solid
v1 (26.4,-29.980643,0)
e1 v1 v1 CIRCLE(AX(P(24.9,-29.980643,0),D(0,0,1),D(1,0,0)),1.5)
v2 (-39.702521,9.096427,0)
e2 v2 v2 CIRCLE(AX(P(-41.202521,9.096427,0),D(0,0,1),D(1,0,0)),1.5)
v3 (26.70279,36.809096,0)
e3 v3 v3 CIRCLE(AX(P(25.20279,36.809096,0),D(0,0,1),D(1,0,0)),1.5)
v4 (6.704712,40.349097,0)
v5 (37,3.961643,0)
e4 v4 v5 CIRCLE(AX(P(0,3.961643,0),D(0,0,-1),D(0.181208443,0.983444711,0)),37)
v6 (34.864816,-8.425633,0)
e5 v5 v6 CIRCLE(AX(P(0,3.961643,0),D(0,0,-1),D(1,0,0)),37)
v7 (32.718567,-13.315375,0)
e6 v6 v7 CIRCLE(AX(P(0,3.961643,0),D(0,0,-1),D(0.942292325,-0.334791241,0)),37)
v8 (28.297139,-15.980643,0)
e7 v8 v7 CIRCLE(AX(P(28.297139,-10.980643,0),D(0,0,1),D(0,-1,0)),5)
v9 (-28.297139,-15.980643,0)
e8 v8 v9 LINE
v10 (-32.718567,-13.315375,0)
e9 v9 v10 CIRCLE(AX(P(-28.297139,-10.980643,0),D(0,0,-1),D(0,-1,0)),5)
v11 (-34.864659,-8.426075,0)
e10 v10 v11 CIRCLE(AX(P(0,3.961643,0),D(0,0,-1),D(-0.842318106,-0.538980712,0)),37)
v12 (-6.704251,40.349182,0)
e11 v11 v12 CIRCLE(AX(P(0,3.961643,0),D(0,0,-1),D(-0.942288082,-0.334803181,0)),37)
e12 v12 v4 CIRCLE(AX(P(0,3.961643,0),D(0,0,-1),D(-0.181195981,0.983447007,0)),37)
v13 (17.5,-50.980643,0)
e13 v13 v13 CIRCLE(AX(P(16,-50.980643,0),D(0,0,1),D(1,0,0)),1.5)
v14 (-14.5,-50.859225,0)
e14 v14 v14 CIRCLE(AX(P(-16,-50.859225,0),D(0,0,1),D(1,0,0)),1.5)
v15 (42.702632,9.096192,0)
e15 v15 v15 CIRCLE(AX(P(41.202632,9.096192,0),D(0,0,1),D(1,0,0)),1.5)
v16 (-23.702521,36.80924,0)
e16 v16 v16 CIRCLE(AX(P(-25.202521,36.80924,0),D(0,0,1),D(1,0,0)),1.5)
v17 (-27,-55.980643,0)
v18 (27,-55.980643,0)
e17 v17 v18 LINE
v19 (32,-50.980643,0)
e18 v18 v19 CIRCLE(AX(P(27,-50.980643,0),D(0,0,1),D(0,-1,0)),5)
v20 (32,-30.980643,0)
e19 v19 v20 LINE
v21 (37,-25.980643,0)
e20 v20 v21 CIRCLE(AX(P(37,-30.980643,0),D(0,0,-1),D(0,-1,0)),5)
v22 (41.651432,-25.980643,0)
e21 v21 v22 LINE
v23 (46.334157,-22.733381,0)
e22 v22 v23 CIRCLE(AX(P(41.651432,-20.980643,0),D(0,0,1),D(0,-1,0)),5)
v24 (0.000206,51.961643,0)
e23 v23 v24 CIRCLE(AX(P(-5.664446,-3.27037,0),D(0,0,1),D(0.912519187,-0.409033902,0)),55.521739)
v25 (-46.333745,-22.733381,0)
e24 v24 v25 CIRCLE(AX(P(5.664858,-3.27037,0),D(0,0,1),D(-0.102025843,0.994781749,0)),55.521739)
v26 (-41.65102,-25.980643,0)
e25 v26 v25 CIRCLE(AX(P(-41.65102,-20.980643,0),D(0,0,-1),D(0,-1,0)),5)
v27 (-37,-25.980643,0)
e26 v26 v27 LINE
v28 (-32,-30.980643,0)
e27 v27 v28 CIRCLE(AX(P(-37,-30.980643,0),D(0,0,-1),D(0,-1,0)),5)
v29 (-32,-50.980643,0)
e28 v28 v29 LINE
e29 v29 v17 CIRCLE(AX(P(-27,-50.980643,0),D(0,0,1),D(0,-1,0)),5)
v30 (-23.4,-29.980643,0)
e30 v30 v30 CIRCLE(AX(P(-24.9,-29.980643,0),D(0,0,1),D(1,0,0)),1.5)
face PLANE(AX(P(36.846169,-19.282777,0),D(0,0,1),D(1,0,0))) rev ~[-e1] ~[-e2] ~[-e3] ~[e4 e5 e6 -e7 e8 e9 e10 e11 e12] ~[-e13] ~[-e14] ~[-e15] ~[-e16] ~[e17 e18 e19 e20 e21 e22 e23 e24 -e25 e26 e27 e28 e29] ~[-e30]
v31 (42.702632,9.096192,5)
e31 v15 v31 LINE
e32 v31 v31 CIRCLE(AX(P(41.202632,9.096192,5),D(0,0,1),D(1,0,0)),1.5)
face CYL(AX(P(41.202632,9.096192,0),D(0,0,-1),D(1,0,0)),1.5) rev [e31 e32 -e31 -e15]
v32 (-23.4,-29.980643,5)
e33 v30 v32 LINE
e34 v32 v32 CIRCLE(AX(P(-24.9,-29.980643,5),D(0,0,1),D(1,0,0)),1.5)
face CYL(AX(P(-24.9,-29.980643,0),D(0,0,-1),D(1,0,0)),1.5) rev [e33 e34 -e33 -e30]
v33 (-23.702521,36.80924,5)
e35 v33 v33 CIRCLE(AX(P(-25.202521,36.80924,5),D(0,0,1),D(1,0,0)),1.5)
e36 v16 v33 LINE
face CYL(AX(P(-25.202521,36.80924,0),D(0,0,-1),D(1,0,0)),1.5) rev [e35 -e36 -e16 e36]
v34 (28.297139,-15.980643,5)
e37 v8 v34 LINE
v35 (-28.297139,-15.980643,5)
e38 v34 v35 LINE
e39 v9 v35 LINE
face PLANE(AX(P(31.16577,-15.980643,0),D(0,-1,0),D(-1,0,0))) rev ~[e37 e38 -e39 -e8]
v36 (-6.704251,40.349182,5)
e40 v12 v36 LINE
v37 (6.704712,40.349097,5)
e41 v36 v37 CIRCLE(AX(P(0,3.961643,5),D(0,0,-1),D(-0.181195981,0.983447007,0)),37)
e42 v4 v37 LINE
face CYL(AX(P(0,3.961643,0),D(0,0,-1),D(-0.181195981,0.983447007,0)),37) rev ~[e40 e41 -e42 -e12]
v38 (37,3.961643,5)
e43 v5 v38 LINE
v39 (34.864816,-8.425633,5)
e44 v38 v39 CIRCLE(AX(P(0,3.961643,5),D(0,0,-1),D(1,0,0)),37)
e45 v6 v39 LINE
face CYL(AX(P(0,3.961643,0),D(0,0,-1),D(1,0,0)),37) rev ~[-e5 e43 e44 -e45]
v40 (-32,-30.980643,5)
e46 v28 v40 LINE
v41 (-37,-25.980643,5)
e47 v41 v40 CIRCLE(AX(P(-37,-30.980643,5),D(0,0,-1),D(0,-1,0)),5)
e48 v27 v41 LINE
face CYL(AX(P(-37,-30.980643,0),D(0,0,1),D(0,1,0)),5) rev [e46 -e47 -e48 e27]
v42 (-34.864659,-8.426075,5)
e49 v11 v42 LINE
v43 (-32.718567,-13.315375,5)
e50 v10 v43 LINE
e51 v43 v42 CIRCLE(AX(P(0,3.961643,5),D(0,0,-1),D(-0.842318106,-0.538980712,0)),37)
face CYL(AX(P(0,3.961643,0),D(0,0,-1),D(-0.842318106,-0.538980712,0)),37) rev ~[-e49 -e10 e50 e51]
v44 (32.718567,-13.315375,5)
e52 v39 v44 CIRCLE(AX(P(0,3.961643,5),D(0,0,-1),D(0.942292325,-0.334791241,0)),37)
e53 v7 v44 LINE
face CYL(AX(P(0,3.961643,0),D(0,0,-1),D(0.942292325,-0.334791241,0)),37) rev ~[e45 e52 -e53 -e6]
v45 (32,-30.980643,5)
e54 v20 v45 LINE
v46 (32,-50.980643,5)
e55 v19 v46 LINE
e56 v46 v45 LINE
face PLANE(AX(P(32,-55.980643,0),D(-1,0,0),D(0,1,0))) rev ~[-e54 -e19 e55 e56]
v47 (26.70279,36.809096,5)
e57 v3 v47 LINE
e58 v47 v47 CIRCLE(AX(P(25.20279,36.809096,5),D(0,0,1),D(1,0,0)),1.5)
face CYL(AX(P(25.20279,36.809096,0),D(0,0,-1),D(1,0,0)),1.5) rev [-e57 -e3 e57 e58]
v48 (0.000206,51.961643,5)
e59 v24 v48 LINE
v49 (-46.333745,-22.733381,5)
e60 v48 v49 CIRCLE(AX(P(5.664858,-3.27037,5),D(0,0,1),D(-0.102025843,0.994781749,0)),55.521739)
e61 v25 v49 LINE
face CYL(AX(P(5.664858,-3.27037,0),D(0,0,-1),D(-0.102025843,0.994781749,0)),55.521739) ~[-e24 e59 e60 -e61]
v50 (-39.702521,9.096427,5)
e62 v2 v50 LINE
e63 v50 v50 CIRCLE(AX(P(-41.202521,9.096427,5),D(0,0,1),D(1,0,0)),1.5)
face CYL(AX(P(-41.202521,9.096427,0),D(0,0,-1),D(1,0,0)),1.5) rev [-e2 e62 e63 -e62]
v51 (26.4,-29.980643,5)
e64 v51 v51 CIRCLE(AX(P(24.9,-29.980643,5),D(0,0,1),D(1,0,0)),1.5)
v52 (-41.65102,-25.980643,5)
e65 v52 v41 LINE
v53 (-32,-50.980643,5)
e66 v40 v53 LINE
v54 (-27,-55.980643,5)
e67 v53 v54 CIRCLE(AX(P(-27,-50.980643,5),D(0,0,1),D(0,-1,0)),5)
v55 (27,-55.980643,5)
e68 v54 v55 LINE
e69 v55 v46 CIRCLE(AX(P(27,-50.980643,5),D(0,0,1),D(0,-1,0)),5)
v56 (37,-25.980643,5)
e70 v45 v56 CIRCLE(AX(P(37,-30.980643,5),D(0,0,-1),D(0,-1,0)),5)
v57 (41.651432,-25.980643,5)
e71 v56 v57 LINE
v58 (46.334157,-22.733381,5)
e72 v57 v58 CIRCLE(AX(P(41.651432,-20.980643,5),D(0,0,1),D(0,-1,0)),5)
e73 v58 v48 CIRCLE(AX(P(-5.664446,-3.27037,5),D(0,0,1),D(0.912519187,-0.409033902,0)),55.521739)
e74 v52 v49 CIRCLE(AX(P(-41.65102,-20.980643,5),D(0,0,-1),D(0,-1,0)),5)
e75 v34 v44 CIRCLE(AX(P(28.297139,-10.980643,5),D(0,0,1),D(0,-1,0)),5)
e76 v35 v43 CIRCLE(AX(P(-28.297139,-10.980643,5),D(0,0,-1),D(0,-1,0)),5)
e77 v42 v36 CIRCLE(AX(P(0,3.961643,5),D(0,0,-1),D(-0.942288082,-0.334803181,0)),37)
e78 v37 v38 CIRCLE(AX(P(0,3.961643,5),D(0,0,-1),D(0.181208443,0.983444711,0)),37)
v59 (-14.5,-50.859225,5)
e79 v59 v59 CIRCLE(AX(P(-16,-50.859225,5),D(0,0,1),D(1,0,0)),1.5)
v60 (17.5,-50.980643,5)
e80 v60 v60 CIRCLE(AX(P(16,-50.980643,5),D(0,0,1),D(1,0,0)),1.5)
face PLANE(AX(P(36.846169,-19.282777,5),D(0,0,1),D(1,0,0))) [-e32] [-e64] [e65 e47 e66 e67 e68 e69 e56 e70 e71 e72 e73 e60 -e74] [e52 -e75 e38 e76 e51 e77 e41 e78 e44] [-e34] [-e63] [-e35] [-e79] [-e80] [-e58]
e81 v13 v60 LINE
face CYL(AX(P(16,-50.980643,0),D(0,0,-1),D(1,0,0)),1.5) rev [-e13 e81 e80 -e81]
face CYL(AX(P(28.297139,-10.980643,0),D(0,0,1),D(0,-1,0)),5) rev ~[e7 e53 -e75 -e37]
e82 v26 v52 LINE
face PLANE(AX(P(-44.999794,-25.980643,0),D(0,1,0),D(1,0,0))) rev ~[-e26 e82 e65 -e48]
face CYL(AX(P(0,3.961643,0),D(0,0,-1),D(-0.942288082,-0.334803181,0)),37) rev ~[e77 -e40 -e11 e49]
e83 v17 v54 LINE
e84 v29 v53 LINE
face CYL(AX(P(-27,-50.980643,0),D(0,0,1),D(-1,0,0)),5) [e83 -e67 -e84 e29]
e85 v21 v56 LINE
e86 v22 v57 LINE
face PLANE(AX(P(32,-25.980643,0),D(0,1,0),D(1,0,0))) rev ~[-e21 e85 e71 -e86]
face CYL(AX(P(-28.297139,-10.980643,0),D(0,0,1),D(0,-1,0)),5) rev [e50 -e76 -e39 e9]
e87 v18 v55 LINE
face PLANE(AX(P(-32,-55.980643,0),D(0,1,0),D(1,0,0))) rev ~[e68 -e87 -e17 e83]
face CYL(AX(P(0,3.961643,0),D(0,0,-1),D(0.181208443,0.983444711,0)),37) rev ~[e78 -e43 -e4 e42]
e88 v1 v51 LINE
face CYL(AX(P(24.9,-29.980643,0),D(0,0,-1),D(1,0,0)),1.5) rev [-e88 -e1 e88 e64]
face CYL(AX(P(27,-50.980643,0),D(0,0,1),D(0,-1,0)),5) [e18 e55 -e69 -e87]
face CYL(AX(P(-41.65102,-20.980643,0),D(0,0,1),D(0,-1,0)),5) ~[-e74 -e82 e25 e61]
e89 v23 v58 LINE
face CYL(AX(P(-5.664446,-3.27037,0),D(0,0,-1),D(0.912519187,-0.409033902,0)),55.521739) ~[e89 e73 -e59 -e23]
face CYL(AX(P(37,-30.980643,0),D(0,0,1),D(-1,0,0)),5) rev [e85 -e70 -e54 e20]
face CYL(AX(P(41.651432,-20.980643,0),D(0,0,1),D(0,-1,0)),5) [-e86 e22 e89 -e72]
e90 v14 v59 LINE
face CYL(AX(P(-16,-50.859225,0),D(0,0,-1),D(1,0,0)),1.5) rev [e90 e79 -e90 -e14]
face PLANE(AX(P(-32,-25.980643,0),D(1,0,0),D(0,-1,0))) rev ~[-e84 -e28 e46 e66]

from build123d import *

# Parameters (mm, degrees)
F0_R     = 1.5
F1_DEPTH = 5
F2_R     = 5


# Not quite as in the source:
# - a feature names something its author has since deleted; it is built from what else it names


with BuildPart() as f1:
    # F0 (on Top) → F1 (new body)
    with BuildSketch(Plane.XY):
        with BuildLine():
            Line((32, -25.9806431703), (45.0002060157, -25.9806431703))
            Line((45.0002060157, -25.9806431703), (34.8648160141, -8.425632733))
            ThreePointArc((34.8648160141, -8.425632733), (33.2306953855, -12.3086021935), (31.1657699329, -15.9806431703))
            Line((31.1657699329, -15.9806431703), (32, -15.9806431703))
            Line((32, -15.9806431703), (32, -25.9806431703))
        make_face()
        with BuildLine():
            Line((34.8648160141, -8.425632733), (45.0002060157, -25.9806431703))
            ThreePointArc((45.0002060157, -25.9806431703), (42.4187903028, 24.4905), (0.0002060157, 51.9616431703))
            Line((0.0002060157, 51.9616431703), (6.7047123911, 40.3490974884))
            ThreePointArc((6.7047123911, 40.3490974884), (28.4347881869, 27.6357391565), (37, 3.9616431703))
            ThreePointArc((37, 3.9616431703), (36.4622969142, -2.3233312719), (34.8648160141, -8.425632733))
        make_face()
        with Locations((41.2026322213, 9.0961922878)):
            Circle(F0_R, mode=Mode.SUBTRACT)
        with Locations((25.2027902051, 36.8090964203)):
            Circle(F0_R, mode=Mode.SUBTRACT)
        with BuildLine():
            Line((32, -55.9806431703), (32, -25.9806431703))
            Line((32, -25.9806431703), (21.7361332508, -25.9806431703))
            ThreePointArc((21.7361332508, -25.9806431703), (0, -33.0383568297), (-21.7361332508, -25.9806431703))
            Line((-21.7361332508, -25.9806431703), (-32, -25.9806431703))
            Line((-32, -25.9806431703), (-32, -55.9806431703))
            Line((-32, -55.9806431703), (32, -55.9806431703))
        make_face()
        with Locations((-16, -50.8592247836)):
            Circle(F0_R, mode=Mode.SUBTRACT)
        with Locations((-24.9, -29.9806431703)):
            Circle(F0_R, mode=Mode.SUBTRACT)
        with Locations((16, -50.9806431703)):
            Circle(F0_R, mode=Mode.SUBTRACT)
        with Locations((24.9, -29.9806431703)):
            Circle(F0_R, mode=Mode.SUBTRACT)
        with BuildLine():
            Line((21.7361332508, -25.9806431703), (32, -25.9806431703))
            Line((32, -25.9806431703), (32, -15.9806431703))
            Line((32, -15.9806431703), (31.1657699329, -15.9806431703))
            ThreePointArc((31.1657699329, -15.9806431703), (26.9193766665, -21.422350997), (21.7361332508, -25.9806431703))
        make_face()
        with BuildLine():
            Line((6.7047123911, 40.3490974884), (0.0002060157, 51.9616431703))
            Line((0.0002060157, 51.9616431703), (-6.7042513108, 40.3491824435))
            ThreePointArc((-6.7042513108, 40.3491824435), (0.0002344208, 40.9616431696), (6.7047123911, 40.3490974884))
        make_face()
        with BuildLine():
            Line((-6.7042513108, 40.3491824435), (0.0002060157, 51.9616431703))
            ThreePointArc((0.0002060157, 51.9616431703), (-42.4183782713, 24.4905), (-44.9997939843, -25.9806431703))
            Line((-44.9997939843, -25.9806431703), (-34.8646590472, -8.4260745178))
            ThreePointArc((-34.8646590472, -8.4260745178), (-32.04293994, 22.4616431703), (-6.7042513108, 40.3491824435))
        make_face()
        with Locations((-41.202520651, 9.0964271731)):
            Circle(F0_R, mode=Mode.SUBTRACT)
        with Locations((-25.202520651, 36.8092400942)):
            Circle(F0_R, mode=Mode.SUBTRACT)
        with BuildLine():
            ThreePointArc((-21.7361332508, -25.9806431703), (0, -33.0383568297), (21.7361332508, -25.9806431703))
            Line((21.7361332508, -25.9806431703), (-21.7361332508, -25.9806431703))
        make_face()
        with BuildLine():
            Line((-21.7361332508, -25.9806431703), (21.7361332508, -25.9806431703))
            ThreePointArc((21.7361332508, -25.9806431703), (26.9193766665, -21.422350997), (31.1657699329, -15.9806431703))
            Line((31.1657699329, -15.9806431703), (-31.1657699329, -15.9806431703))
            ThreePointArc((-31.1657699329, -15.9806431703), (-26.9193766665, -21.422350997), (-21.7361332508, -25.9806431703))
        make_face()
        with BuildLine():
            Line((-34.8646590472, -8.4260745178), (-44.9997939843, -25.9806431703))
            Line((-44.9997939843, -25.9806431703), (-32, -25.9806431703))
            Line((-32, -25.9806431703), (-32, -15.9806431703))
            Line((-32, -15.9806431703), (-31.1657699329, -15.9806431703))
            ThreePointArc((-31.1657699329, -15.9806431703), (-33.2305923015, -12.3088127328), (-34.8646590472, -8.4260745178))
        make_face()
        with BuildLine():
            Line((-32, -25.9806431703), (-21.7361332508, -25.9806431703))
            ThreePointArc((-21.7361332508, -25.9806431703), (-26.9193766665, -21.422350997), (-31.1657699329, -15.9806431703))
            Line((-31.1657699329, -15.9806431703), (-32, -15.9806431703))
            Line((-32, -15.9806431703), (-32, -25.9806431703))
        make_face()
    extrude(amount=F1_DEPTH)

    # F2
    f2_edges = [f1.edges().sort_by_distance(p)[0] for p in [
        (-32, -25.980643, 2.5),
        (-44.999794, -25.980643, 2.5),
        (32, -25.980643, 2.5),
        (45.000206, -25.980643, 2.5),
        (-32, -55.980643, 2.5),
        (32, -55.980643, 2.5),
        (-31.16577, -15.980643, 2.5),
        (31.16577, -15.980643, 2.5),
    ]]
    fillet(f2_edges, radius=F2_R)


solid = f1.part
